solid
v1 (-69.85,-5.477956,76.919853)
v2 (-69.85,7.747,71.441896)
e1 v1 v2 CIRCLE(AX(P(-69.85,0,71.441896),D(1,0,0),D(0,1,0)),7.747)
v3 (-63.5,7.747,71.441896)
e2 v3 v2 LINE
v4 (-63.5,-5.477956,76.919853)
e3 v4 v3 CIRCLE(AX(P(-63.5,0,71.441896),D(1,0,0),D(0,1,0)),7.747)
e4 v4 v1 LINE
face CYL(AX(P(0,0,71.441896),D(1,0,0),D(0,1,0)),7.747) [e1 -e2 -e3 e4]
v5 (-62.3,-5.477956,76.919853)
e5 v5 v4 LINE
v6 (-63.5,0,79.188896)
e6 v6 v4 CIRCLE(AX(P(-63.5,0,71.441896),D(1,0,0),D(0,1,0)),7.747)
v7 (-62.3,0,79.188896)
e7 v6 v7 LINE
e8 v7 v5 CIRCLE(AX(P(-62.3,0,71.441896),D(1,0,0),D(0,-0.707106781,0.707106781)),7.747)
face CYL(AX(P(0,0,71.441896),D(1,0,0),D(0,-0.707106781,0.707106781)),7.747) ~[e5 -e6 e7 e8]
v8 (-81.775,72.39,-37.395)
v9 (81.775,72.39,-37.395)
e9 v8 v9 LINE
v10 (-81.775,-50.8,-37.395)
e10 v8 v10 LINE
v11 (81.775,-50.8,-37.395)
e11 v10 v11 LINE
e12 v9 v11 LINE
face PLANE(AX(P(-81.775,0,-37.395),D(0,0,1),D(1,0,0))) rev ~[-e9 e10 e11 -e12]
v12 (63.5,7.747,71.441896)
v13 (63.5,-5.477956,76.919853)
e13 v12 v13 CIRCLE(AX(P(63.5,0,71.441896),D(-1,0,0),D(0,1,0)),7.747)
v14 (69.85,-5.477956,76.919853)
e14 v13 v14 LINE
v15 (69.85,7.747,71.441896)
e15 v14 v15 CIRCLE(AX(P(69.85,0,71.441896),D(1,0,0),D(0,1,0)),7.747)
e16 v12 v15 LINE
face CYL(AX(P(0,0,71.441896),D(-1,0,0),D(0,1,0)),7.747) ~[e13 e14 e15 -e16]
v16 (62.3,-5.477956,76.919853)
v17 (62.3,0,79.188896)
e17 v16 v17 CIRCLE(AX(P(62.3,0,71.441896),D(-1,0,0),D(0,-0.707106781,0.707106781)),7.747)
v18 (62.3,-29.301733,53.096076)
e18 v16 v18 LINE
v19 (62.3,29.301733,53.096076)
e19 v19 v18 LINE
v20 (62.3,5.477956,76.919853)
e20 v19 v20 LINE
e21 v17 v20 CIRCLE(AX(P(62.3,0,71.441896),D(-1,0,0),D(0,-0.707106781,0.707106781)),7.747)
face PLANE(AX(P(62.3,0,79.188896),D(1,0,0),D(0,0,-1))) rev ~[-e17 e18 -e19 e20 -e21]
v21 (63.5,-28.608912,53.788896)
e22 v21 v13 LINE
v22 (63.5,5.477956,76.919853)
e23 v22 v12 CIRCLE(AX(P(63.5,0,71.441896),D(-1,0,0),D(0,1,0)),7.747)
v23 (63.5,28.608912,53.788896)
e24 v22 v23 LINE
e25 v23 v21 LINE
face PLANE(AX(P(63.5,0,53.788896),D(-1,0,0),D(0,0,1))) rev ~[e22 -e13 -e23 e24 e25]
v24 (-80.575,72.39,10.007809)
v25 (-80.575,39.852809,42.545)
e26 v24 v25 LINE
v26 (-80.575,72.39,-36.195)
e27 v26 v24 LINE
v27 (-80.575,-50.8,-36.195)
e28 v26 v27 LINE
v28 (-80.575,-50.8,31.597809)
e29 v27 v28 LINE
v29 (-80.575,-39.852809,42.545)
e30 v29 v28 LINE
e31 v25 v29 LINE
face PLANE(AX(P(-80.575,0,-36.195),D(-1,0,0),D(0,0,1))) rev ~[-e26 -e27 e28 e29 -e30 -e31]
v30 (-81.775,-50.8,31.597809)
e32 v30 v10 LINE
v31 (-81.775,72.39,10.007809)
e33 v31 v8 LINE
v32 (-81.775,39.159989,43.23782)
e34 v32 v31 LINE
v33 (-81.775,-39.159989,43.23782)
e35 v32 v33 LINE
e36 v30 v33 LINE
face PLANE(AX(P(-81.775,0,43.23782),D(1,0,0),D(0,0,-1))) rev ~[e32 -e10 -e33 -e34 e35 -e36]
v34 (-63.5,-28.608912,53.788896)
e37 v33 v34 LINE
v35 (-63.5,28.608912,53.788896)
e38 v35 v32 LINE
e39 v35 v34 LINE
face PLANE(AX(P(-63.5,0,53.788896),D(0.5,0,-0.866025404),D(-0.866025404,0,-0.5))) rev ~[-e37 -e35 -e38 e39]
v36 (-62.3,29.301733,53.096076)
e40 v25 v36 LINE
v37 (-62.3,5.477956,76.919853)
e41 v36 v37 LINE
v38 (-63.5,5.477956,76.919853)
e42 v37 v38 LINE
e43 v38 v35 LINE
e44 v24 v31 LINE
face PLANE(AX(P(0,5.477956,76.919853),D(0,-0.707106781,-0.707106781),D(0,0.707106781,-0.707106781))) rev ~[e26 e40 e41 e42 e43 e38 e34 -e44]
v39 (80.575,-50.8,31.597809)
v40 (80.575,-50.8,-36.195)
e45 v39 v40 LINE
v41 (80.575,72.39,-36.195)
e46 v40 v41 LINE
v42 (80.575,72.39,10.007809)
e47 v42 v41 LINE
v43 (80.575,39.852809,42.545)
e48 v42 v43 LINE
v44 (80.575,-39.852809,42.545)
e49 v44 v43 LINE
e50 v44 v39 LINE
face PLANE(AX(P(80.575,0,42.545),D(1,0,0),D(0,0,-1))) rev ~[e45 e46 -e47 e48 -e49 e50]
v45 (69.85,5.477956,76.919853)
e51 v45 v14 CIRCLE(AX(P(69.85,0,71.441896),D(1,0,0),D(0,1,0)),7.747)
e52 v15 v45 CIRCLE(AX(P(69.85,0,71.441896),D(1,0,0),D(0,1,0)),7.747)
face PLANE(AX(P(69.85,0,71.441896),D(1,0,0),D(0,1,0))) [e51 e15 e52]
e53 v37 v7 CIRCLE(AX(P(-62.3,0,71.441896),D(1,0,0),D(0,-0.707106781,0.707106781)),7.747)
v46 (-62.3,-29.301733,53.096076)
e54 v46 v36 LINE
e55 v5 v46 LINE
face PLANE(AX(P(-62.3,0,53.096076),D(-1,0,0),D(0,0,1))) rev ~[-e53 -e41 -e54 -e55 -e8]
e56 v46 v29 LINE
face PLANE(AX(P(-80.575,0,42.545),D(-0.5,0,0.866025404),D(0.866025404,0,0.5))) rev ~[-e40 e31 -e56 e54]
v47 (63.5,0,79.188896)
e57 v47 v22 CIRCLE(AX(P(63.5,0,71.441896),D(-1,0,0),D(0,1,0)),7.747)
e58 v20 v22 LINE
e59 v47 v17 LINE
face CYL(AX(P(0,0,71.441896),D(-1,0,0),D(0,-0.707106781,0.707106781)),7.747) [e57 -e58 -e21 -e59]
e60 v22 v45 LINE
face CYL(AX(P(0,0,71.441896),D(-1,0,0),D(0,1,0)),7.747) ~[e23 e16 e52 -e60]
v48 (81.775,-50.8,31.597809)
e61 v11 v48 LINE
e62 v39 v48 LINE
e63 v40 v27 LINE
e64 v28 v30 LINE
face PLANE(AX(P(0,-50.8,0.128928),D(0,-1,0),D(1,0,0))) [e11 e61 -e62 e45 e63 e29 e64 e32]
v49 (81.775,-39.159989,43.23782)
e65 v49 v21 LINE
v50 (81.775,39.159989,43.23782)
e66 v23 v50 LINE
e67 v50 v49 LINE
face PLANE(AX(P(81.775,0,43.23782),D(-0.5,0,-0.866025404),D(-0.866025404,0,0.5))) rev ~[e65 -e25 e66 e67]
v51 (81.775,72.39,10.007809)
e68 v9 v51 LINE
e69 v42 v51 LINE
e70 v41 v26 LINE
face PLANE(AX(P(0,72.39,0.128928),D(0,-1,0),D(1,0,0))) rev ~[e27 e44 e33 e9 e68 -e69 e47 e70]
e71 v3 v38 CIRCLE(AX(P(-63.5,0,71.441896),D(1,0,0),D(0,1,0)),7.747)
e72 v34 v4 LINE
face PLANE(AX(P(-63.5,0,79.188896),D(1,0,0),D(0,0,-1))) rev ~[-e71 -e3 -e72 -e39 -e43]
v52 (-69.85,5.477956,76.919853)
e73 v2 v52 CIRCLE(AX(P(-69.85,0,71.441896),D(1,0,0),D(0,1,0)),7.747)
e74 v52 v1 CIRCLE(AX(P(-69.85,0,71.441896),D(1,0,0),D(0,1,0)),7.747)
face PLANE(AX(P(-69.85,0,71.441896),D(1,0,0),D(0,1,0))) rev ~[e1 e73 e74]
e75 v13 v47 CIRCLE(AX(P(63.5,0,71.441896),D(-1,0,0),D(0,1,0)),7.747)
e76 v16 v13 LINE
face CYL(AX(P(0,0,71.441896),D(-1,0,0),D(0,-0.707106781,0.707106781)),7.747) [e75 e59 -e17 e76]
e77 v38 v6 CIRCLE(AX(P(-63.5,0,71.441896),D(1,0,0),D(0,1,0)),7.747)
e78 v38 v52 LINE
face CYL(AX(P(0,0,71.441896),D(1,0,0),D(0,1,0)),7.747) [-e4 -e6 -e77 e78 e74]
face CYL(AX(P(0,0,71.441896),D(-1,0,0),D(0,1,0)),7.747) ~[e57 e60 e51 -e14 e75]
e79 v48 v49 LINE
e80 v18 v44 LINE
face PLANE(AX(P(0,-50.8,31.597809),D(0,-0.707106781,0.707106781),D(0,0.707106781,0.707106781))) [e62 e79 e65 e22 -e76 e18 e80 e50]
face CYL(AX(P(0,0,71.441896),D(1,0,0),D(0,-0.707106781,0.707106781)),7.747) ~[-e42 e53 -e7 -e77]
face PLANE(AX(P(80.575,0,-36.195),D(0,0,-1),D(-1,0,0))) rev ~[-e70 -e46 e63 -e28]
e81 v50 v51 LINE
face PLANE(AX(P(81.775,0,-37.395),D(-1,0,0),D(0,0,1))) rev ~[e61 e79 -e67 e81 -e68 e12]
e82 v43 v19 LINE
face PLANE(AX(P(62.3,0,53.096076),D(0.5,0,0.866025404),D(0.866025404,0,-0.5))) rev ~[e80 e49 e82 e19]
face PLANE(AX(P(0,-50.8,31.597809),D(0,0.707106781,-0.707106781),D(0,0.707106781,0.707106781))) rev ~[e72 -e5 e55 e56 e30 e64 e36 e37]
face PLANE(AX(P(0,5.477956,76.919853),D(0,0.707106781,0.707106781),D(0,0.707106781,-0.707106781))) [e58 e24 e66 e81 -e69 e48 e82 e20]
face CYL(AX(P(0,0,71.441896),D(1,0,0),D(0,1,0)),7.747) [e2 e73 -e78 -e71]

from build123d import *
from build123d import SkipClean  # not in build123d's __all__

# Parameters (mm, degrees)
F1_DEPTH      = 72.39
F1_DEPTH_BACK = 50.8
F2_R          = 7.747
F3_DEPTH      = 69.85
F3_DEPTH_BACK = 69.85
F4_W          = 124.6
F4_H          = 26.092820323
F5_DEPTH      = 72.391
F5_DEPTH_BACK = 50.801
F7_DEPTH      = 81.776
F7_DEPTH_BACK = 81.776


with BuildPart() as f1:
    # F0 (on Front) → F1 (new body, two sides)
    with BuildSketch(Plane.XZ) as f1_sk:
        Polygon((80.575, -36.195), (0, -36.195), (-80.575, -36.195), (-80.575, 42.545), (-62.3, 53.0960761694), (-62.3, 79.1888964925), (-63.5, 79.1888964925), (-63.5, 53.7888964925), (-81.775, 43.237820323), (-81.775, -37.395), (0, -37.395), (81.775, -37.395), (81.775, 43.237820323), (63.5, 53.7888964925), (63.5, 79.1888964925), (62.3, 79.1888964925), (62.3, 53.0960761694), (80.575, 42.545), align=None)
    extrude(amount=-F1_DEPTH)
    extrude(f1_sk.sketch, amount=F1_DEPTH_BACK)

    # F2 (on Right) → F3 (join, two sides)
    with BuildSketch(Plane.YZ) as f3_sk:
        with Locations((0, 71.4418964925)):
            Circle(F2_R)
    extrude(amount=-F3_DEPTH)
    extrude(f3_sk.sketch, amount=F3_DEPTH_BACK)

    # F4 (on Front) → F5 (cut, two sides)
    with BuildSketch(Plane.XZ) as f5_sk:
        with Locations((0, 66.142486331)):
            Rectangle(F4_W, F4_H)
    extrude(amount=-F5_DEPTH, mode=Mode.SUBTRACT)
    extrude(f5_sk.sketch, amount=F5_DEPTH_BACK, mode=Mode.SUBTRACT)

    # F6 (on Right) → F7 (cut, two sides)
    with BuildSketch(Plane.YZ) as f7_sk:
        with BuildLine():
            Line((-50.8, 81.7288964925), (-50.8, 31.5978089602))
            Line((-50.8, 31.5978089602), (-5.4779562339, 76.9198527263))
            ThreePointArc((-5.4779562339, 76.9198527263), (0, 79.1888964925), (5.4779562339, 76.9198527263))
            Line((5.4779562339, 76.9198527263), (72.39, 10.0078089602))
            Line((72.39, 10.0078089602), (72.39, 81.7288964925))
            Line((72.39, 81.7288964925), (-50.8, 81.7288964925))
        make_face()
    with SkipClean():  # cleaning this boolean's faces spoils the solid; the shape is the same uncleaned
        extrude(amount=-F7_DEPTH, mode=Mode.SUBTRACT)
        extrude(f7_sk.sketch, amount=F7_DEPTH_BACK, mode=Mode.SUBTRACT)


solid = f1.part
